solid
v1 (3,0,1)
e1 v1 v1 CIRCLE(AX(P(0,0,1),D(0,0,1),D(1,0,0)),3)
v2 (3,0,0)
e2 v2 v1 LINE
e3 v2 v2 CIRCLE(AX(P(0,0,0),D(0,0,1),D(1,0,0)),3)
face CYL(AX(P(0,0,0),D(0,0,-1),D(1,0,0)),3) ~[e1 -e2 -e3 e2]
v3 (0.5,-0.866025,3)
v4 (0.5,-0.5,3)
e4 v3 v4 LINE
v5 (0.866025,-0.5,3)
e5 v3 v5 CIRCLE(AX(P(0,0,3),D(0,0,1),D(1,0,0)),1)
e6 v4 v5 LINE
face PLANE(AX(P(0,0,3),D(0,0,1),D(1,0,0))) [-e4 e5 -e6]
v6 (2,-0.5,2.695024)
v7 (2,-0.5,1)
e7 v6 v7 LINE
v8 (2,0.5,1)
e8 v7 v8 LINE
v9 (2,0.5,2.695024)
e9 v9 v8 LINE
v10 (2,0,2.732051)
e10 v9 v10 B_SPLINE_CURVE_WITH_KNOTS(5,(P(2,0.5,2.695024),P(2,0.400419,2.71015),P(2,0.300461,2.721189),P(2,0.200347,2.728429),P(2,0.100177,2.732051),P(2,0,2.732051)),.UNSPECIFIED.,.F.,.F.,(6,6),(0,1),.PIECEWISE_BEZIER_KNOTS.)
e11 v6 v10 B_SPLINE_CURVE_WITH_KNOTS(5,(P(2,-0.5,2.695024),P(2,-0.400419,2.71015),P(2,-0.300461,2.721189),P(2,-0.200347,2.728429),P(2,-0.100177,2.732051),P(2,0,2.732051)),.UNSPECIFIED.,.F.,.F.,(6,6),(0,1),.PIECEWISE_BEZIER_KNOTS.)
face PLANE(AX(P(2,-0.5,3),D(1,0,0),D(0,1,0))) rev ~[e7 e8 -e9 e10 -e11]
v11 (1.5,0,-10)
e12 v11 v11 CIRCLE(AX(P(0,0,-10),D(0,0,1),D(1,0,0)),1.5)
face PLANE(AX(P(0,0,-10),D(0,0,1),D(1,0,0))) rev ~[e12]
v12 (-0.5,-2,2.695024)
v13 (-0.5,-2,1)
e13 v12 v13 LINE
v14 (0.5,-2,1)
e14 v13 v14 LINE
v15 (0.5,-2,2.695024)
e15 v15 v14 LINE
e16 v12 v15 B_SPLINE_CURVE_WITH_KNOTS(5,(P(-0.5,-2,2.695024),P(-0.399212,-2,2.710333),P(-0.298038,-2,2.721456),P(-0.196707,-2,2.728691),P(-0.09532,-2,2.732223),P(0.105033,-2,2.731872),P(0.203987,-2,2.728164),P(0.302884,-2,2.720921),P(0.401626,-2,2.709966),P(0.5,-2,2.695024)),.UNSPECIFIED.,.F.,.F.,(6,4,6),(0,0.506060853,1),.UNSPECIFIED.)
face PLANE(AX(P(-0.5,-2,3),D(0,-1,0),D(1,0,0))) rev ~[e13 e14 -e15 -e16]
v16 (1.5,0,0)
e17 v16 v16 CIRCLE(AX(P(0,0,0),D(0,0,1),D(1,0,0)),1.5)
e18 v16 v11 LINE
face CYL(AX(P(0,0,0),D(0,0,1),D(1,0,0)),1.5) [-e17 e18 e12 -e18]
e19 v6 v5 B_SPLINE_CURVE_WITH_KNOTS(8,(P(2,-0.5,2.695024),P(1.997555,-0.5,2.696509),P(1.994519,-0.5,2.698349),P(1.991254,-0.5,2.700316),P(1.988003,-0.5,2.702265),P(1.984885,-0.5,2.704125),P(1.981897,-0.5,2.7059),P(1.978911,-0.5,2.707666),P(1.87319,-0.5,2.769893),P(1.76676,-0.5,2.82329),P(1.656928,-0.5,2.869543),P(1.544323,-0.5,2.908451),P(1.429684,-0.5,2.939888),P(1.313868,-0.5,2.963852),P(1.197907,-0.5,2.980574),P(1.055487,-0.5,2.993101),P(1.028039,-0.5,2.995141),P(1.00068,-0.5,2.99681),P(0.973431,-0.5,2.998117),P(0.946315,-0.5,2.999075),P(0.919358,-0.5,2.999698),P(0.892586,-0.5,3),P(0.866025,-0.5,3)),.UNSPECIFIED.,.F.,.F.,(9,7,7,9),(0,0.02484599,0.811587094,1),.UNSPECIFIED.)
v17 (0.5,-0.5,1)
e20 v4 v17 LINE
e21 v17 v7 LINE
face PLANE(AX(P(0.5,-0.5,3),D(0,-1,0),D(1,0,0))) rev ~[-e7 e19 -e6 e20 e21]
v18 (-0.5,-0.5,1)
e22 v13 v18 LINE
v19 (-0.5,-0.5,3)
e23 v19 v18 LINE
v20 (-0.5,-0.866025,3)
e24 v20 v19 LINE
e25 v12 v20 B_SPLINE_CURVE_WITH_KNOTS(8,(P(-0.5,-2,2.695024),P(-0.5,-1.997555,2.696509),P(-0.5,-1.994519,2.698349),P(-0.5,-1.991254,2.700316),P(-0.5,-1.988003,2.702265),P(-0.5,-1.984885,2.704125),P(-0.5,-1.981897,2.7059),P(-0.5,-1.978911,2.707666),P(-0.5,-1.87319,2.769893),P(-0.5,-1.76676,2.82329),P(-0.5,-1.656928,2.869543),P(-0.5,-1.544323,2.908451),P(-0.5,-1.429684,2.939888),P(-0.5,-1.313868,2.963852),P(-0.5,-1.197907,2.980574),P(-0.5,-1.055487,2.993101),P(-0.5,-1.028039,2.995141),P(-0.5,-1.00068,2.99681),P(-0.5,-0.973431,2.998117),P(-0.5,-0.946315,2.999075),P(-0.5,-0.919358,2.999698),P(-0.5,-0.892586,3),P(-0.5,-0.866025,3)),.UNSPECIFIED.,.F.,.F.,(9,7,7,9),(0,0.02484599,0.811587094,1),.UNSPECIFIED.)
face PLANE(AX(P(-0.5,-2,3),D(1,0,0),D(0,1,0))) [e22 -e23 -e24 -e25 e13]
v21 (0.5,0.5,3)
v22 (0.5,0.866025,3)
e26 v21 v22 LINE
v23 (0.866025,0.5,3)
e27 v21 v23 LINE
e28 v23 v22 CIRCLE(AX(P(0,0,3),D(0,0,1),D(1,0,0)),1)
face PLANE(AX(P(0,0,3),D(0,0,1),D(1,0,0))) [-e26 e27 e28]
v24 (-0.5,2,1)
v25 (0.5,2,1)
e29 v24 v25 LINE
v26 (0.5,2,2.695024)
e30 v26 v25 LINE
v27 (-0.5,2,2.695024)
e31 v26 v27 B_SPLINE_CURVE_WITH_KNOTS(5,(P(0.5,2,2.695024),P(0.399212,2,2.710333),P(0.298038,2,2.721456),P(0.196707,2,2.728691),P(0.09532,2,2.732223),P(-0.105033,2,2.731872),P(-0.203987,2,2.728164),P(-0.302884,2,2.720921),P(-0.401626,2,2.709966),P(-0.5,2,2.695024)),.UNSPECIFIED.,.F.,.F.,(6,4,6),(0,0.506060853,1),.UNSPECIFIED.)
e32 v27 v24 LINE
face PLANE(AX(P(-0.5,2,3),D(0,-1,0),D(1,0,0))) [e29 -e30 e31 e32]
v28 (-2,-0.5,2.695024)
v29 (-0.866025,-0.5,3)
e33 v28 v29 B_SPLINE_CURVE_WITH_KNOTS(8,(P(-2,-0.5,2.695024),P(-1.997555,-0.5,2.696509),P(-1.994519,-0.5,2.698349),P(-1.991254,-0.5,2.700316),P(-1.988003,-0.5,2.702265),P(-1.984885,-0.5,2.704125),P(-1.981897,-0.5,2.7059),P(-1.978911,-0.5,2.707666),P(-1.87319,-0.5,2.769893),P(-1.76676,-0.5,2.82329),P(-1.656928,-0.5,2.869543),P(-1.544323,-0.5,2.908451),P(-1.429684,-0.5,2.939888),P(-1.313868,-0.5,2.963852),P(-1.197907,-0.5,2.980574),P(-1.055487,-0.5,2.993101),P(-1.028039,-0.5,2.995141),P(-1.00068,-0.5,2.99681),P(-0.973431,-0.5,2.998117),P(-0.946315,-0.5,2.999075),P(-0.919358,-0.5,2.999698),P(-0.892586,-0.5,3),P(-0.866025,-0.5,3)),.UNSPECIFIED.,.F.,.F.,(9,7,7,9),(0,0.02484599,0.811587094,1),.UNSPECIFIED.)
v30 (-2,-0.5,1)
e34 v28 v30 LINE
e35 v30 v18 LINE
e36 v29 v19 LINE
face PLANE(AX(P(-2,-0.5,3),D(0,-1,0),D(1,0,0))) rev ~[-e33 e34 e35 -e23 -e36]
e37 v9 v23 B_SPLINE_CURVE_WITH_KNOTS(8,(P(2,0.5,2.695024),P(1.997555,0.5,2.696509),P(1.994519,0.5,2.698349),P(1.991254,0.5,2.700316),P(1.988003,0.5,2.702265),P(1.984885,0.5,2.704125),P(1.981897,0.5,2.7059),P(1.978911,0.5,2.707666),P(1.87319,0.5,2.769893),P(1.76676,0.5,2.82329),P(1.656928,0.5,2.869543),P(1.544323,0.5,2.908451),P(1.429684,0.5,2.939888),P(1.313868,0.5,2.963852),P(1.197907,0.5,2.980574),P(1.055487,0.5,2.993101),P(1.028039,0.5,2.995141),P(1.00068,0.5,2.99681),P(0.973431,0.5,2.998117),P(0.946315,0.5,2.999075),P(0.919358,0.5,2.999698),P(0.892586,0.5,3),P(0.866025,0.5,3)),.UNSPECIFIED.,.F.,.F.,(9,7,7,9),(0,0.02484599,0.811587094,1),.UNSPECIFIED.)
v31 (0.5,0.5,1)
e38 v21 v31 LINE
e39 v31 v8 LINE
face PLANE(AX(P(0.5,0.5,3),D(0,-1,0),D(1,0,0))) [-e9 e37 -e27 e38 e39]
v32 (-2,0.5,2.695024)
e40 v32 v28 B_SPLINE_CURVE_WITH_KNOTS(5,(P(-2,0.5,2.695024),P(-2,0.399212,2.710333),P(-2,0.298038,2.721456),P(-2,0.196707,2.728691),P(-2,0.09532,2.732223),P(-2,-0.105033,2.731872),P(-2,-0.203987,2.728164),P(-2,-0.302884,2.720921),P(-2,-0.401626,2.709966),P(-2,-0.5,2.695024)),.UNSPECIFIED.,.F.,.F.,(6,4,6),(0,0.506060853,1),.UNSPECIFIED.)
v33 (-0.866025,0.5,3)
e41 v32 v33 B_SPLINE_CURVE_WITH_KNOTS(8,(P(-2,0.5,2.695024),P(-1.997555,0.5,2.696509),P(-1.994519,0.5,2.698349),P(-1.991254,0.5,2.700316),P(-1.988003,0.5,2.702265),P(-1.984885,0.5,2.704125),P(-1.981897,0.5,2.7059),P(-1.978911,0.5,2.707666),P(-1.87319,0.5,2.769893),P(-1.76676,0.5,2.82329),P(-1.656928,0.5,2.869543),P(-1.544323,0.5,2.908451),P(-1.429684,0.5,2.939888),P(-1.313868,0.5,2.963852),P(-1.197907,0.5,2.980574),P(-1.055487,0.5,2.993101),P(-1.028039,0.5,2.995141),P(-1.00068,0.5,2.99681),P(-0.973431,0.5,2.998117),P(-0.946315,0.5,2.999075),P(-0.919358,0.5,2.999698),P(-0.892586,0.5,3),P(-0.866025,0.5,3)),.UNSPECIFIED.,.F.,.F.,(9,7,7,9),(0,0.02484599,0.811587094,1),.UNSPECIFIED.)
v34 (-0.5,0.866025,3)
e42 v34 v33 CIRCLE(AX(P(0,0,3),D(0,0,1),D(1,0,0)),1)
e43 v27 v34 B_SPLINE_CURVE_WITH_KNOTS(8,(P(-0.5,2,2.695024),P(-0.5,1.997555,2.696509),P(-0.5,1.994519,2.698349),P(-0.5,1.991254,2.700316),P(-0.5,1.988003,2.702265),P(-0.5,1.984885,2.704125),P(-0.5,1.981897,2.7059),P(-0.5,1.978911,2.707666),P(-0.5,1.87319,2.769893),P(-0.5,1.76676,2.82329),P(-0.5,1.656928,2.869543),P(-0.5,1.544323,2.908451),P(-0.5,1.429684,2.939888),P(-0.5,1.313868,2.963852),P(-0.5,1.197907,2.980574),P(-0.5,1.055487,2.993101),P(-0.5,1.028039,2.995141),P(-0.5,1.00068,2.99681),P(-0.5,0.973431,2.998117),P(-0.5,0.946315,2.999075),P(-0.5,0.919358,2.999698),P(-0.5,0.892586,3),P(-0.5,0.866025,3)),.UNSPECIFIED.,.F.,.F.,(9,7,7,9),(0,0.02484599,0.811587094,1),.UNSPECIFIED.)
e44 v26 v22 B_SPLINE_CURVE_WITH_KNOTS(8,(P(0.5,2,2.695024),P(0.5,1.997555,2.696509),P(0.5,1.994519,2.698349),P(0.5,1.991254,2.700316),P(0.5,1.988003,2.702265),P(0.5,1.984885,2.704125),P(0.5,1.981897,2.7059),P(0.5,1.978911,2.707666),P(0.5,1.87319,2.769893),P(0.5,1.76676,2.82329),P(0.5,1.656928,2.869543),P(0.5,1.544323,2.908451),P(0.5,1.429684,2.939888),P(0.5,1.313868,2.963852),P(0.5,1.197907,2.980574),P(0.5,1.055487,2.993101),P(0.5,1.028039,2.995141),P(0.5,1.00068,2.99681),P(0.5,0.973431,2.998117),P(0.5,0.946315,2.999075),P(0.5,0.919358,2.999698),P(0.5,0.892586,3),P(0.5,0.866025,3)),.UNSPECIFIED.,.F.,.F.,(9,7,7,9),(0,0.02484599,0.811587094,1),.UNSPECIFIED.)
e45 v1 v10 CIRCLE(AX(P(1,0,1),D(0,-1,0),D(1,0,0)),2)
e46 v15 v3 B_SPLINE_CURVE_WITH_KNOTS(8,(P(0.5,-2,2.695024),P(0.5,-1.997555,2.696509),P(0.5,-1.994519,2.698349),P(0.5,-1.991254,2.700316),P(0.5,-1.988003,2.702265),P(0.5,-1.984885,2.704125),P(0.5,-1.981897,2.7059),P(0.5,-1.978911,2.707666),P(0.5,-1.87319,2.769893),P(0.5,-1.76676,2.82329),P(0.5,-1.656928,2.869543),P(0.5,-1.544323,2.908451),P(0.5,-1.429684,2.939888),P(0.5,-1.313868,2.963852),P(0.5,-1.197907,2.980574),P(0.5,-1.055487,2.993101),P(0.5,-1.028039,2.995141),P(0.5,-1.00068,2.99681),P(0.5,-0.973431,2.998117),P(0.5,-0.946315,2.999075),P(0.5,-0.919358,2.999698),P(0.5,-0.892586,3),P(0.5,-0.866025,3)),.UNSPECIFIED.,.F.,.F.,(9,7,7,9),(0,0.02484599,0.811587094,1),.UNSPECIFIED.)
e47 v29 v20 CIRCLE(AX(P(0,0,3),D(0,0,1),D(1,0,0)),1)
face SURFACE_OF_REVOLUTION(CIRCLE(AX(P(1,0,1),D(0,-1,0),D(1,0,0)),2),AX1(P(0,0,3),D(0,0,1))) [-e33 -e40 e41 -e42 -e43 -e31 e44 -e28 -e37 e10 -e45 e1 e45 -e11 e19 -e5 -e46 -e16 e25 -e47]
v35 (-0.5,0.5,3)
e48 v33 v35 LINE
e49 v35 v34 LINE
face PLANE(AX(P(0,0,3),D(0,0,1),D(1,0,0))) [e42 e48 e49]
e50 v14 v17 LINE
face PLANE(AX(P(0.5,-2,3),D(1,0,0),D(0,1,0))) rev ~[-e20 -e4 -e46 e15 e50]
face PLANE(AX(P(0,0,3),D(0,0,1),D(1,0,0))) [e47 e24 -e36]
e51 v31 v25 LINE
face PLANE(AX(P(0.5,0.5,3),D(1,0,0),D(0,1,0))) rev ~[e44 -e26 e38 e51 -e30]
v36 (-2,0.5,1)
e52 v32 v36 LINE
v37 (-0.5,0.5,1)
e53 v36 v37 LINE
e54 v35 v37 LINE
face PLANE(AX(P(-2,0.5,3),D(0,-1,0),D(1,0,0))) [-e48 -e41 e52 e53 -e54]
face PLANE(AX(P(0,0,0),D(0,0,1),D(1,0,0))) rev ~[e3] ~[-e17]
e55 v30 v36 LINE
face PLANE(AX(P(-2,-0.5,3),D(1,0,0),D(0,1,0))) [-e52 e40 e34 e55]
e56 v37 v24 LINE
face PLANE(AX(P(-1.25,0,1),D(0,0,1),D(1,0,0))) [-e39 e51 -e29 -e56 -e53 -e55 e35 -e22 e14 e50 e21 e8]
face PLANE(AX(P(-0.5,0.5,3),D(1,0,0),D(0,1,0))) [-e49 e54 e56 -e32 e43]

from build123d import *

# Parameters (mm, degrees)
F0_R     = 1.5
F1_DEPTH = 10
F2_R     = 3
F2_R_2   = 1.5
F3_DEPTH = 3
F4_W     = 1.5
F4_H     = 1
F4_W_2   = 1
F4_H_2   = 1.5
F5_DEPTH = 2


# Not quite as in the source:
# - a fillet or chamfer that OpenCascade refuses, or shapes differently, is made with other operations: its cross-section is extruded or revolved along the edge and cut away or added


with BuildPart() as f1:
    # F0 (on Top) → F1 (new body)
    with BuildSketch(Plane.XY):
        Circle(F0_R)
    extrude(amount=-F1_DEPTH)

    # F2 (on face) → F3 (join)
    with BuildSketch(Plane.XY):
        Circle(F2_R)
        Circle(F2_R_2, mode=Mode.SUBTRACT)
        Circle(F2_R_2)
    extrude(amount=F3_DEPTH)

    # F4 (on face) → F5 (cut)
    with BuildSketch(Plane.XY.offset(3)):
        with Locations((-1.25, 0)):
            Rectangle(F4_W, F4_H)
        with Locations((0, 1.25)):
            Rectangle(F4_W_2, F4_H_2)
        Rectangle(F4_W_2, F4_H)
        with Locations((1.25, 0)):
            Rectangle(F4_W, F4_H)
        with Locations((0, -1.25)):
            Rectangle(F4_W_2, F4_H_2)
    extrude(amount=-F5_DEPTH, mode=Mode.SUBTRACT)

    # F6: fillet of radius 2 on 1 edges, made by hand

    # F6_s1 → F6_t2 (revolve, cut)
    with BuildSketch(Plane.XZ):
        with BuildLine():
            ThreePointArc((3, 1), (2.4142135624, 2.4142135624), (1, 3))
            Line((1, 3), (3, 3))
            Line((3, 3), (3, 1))
        make_face()
    revolve(axis=Axis((0, 0, 3), (0, 0, 1)), mode=Mode.SUBTRACT)


solid = f1.part
